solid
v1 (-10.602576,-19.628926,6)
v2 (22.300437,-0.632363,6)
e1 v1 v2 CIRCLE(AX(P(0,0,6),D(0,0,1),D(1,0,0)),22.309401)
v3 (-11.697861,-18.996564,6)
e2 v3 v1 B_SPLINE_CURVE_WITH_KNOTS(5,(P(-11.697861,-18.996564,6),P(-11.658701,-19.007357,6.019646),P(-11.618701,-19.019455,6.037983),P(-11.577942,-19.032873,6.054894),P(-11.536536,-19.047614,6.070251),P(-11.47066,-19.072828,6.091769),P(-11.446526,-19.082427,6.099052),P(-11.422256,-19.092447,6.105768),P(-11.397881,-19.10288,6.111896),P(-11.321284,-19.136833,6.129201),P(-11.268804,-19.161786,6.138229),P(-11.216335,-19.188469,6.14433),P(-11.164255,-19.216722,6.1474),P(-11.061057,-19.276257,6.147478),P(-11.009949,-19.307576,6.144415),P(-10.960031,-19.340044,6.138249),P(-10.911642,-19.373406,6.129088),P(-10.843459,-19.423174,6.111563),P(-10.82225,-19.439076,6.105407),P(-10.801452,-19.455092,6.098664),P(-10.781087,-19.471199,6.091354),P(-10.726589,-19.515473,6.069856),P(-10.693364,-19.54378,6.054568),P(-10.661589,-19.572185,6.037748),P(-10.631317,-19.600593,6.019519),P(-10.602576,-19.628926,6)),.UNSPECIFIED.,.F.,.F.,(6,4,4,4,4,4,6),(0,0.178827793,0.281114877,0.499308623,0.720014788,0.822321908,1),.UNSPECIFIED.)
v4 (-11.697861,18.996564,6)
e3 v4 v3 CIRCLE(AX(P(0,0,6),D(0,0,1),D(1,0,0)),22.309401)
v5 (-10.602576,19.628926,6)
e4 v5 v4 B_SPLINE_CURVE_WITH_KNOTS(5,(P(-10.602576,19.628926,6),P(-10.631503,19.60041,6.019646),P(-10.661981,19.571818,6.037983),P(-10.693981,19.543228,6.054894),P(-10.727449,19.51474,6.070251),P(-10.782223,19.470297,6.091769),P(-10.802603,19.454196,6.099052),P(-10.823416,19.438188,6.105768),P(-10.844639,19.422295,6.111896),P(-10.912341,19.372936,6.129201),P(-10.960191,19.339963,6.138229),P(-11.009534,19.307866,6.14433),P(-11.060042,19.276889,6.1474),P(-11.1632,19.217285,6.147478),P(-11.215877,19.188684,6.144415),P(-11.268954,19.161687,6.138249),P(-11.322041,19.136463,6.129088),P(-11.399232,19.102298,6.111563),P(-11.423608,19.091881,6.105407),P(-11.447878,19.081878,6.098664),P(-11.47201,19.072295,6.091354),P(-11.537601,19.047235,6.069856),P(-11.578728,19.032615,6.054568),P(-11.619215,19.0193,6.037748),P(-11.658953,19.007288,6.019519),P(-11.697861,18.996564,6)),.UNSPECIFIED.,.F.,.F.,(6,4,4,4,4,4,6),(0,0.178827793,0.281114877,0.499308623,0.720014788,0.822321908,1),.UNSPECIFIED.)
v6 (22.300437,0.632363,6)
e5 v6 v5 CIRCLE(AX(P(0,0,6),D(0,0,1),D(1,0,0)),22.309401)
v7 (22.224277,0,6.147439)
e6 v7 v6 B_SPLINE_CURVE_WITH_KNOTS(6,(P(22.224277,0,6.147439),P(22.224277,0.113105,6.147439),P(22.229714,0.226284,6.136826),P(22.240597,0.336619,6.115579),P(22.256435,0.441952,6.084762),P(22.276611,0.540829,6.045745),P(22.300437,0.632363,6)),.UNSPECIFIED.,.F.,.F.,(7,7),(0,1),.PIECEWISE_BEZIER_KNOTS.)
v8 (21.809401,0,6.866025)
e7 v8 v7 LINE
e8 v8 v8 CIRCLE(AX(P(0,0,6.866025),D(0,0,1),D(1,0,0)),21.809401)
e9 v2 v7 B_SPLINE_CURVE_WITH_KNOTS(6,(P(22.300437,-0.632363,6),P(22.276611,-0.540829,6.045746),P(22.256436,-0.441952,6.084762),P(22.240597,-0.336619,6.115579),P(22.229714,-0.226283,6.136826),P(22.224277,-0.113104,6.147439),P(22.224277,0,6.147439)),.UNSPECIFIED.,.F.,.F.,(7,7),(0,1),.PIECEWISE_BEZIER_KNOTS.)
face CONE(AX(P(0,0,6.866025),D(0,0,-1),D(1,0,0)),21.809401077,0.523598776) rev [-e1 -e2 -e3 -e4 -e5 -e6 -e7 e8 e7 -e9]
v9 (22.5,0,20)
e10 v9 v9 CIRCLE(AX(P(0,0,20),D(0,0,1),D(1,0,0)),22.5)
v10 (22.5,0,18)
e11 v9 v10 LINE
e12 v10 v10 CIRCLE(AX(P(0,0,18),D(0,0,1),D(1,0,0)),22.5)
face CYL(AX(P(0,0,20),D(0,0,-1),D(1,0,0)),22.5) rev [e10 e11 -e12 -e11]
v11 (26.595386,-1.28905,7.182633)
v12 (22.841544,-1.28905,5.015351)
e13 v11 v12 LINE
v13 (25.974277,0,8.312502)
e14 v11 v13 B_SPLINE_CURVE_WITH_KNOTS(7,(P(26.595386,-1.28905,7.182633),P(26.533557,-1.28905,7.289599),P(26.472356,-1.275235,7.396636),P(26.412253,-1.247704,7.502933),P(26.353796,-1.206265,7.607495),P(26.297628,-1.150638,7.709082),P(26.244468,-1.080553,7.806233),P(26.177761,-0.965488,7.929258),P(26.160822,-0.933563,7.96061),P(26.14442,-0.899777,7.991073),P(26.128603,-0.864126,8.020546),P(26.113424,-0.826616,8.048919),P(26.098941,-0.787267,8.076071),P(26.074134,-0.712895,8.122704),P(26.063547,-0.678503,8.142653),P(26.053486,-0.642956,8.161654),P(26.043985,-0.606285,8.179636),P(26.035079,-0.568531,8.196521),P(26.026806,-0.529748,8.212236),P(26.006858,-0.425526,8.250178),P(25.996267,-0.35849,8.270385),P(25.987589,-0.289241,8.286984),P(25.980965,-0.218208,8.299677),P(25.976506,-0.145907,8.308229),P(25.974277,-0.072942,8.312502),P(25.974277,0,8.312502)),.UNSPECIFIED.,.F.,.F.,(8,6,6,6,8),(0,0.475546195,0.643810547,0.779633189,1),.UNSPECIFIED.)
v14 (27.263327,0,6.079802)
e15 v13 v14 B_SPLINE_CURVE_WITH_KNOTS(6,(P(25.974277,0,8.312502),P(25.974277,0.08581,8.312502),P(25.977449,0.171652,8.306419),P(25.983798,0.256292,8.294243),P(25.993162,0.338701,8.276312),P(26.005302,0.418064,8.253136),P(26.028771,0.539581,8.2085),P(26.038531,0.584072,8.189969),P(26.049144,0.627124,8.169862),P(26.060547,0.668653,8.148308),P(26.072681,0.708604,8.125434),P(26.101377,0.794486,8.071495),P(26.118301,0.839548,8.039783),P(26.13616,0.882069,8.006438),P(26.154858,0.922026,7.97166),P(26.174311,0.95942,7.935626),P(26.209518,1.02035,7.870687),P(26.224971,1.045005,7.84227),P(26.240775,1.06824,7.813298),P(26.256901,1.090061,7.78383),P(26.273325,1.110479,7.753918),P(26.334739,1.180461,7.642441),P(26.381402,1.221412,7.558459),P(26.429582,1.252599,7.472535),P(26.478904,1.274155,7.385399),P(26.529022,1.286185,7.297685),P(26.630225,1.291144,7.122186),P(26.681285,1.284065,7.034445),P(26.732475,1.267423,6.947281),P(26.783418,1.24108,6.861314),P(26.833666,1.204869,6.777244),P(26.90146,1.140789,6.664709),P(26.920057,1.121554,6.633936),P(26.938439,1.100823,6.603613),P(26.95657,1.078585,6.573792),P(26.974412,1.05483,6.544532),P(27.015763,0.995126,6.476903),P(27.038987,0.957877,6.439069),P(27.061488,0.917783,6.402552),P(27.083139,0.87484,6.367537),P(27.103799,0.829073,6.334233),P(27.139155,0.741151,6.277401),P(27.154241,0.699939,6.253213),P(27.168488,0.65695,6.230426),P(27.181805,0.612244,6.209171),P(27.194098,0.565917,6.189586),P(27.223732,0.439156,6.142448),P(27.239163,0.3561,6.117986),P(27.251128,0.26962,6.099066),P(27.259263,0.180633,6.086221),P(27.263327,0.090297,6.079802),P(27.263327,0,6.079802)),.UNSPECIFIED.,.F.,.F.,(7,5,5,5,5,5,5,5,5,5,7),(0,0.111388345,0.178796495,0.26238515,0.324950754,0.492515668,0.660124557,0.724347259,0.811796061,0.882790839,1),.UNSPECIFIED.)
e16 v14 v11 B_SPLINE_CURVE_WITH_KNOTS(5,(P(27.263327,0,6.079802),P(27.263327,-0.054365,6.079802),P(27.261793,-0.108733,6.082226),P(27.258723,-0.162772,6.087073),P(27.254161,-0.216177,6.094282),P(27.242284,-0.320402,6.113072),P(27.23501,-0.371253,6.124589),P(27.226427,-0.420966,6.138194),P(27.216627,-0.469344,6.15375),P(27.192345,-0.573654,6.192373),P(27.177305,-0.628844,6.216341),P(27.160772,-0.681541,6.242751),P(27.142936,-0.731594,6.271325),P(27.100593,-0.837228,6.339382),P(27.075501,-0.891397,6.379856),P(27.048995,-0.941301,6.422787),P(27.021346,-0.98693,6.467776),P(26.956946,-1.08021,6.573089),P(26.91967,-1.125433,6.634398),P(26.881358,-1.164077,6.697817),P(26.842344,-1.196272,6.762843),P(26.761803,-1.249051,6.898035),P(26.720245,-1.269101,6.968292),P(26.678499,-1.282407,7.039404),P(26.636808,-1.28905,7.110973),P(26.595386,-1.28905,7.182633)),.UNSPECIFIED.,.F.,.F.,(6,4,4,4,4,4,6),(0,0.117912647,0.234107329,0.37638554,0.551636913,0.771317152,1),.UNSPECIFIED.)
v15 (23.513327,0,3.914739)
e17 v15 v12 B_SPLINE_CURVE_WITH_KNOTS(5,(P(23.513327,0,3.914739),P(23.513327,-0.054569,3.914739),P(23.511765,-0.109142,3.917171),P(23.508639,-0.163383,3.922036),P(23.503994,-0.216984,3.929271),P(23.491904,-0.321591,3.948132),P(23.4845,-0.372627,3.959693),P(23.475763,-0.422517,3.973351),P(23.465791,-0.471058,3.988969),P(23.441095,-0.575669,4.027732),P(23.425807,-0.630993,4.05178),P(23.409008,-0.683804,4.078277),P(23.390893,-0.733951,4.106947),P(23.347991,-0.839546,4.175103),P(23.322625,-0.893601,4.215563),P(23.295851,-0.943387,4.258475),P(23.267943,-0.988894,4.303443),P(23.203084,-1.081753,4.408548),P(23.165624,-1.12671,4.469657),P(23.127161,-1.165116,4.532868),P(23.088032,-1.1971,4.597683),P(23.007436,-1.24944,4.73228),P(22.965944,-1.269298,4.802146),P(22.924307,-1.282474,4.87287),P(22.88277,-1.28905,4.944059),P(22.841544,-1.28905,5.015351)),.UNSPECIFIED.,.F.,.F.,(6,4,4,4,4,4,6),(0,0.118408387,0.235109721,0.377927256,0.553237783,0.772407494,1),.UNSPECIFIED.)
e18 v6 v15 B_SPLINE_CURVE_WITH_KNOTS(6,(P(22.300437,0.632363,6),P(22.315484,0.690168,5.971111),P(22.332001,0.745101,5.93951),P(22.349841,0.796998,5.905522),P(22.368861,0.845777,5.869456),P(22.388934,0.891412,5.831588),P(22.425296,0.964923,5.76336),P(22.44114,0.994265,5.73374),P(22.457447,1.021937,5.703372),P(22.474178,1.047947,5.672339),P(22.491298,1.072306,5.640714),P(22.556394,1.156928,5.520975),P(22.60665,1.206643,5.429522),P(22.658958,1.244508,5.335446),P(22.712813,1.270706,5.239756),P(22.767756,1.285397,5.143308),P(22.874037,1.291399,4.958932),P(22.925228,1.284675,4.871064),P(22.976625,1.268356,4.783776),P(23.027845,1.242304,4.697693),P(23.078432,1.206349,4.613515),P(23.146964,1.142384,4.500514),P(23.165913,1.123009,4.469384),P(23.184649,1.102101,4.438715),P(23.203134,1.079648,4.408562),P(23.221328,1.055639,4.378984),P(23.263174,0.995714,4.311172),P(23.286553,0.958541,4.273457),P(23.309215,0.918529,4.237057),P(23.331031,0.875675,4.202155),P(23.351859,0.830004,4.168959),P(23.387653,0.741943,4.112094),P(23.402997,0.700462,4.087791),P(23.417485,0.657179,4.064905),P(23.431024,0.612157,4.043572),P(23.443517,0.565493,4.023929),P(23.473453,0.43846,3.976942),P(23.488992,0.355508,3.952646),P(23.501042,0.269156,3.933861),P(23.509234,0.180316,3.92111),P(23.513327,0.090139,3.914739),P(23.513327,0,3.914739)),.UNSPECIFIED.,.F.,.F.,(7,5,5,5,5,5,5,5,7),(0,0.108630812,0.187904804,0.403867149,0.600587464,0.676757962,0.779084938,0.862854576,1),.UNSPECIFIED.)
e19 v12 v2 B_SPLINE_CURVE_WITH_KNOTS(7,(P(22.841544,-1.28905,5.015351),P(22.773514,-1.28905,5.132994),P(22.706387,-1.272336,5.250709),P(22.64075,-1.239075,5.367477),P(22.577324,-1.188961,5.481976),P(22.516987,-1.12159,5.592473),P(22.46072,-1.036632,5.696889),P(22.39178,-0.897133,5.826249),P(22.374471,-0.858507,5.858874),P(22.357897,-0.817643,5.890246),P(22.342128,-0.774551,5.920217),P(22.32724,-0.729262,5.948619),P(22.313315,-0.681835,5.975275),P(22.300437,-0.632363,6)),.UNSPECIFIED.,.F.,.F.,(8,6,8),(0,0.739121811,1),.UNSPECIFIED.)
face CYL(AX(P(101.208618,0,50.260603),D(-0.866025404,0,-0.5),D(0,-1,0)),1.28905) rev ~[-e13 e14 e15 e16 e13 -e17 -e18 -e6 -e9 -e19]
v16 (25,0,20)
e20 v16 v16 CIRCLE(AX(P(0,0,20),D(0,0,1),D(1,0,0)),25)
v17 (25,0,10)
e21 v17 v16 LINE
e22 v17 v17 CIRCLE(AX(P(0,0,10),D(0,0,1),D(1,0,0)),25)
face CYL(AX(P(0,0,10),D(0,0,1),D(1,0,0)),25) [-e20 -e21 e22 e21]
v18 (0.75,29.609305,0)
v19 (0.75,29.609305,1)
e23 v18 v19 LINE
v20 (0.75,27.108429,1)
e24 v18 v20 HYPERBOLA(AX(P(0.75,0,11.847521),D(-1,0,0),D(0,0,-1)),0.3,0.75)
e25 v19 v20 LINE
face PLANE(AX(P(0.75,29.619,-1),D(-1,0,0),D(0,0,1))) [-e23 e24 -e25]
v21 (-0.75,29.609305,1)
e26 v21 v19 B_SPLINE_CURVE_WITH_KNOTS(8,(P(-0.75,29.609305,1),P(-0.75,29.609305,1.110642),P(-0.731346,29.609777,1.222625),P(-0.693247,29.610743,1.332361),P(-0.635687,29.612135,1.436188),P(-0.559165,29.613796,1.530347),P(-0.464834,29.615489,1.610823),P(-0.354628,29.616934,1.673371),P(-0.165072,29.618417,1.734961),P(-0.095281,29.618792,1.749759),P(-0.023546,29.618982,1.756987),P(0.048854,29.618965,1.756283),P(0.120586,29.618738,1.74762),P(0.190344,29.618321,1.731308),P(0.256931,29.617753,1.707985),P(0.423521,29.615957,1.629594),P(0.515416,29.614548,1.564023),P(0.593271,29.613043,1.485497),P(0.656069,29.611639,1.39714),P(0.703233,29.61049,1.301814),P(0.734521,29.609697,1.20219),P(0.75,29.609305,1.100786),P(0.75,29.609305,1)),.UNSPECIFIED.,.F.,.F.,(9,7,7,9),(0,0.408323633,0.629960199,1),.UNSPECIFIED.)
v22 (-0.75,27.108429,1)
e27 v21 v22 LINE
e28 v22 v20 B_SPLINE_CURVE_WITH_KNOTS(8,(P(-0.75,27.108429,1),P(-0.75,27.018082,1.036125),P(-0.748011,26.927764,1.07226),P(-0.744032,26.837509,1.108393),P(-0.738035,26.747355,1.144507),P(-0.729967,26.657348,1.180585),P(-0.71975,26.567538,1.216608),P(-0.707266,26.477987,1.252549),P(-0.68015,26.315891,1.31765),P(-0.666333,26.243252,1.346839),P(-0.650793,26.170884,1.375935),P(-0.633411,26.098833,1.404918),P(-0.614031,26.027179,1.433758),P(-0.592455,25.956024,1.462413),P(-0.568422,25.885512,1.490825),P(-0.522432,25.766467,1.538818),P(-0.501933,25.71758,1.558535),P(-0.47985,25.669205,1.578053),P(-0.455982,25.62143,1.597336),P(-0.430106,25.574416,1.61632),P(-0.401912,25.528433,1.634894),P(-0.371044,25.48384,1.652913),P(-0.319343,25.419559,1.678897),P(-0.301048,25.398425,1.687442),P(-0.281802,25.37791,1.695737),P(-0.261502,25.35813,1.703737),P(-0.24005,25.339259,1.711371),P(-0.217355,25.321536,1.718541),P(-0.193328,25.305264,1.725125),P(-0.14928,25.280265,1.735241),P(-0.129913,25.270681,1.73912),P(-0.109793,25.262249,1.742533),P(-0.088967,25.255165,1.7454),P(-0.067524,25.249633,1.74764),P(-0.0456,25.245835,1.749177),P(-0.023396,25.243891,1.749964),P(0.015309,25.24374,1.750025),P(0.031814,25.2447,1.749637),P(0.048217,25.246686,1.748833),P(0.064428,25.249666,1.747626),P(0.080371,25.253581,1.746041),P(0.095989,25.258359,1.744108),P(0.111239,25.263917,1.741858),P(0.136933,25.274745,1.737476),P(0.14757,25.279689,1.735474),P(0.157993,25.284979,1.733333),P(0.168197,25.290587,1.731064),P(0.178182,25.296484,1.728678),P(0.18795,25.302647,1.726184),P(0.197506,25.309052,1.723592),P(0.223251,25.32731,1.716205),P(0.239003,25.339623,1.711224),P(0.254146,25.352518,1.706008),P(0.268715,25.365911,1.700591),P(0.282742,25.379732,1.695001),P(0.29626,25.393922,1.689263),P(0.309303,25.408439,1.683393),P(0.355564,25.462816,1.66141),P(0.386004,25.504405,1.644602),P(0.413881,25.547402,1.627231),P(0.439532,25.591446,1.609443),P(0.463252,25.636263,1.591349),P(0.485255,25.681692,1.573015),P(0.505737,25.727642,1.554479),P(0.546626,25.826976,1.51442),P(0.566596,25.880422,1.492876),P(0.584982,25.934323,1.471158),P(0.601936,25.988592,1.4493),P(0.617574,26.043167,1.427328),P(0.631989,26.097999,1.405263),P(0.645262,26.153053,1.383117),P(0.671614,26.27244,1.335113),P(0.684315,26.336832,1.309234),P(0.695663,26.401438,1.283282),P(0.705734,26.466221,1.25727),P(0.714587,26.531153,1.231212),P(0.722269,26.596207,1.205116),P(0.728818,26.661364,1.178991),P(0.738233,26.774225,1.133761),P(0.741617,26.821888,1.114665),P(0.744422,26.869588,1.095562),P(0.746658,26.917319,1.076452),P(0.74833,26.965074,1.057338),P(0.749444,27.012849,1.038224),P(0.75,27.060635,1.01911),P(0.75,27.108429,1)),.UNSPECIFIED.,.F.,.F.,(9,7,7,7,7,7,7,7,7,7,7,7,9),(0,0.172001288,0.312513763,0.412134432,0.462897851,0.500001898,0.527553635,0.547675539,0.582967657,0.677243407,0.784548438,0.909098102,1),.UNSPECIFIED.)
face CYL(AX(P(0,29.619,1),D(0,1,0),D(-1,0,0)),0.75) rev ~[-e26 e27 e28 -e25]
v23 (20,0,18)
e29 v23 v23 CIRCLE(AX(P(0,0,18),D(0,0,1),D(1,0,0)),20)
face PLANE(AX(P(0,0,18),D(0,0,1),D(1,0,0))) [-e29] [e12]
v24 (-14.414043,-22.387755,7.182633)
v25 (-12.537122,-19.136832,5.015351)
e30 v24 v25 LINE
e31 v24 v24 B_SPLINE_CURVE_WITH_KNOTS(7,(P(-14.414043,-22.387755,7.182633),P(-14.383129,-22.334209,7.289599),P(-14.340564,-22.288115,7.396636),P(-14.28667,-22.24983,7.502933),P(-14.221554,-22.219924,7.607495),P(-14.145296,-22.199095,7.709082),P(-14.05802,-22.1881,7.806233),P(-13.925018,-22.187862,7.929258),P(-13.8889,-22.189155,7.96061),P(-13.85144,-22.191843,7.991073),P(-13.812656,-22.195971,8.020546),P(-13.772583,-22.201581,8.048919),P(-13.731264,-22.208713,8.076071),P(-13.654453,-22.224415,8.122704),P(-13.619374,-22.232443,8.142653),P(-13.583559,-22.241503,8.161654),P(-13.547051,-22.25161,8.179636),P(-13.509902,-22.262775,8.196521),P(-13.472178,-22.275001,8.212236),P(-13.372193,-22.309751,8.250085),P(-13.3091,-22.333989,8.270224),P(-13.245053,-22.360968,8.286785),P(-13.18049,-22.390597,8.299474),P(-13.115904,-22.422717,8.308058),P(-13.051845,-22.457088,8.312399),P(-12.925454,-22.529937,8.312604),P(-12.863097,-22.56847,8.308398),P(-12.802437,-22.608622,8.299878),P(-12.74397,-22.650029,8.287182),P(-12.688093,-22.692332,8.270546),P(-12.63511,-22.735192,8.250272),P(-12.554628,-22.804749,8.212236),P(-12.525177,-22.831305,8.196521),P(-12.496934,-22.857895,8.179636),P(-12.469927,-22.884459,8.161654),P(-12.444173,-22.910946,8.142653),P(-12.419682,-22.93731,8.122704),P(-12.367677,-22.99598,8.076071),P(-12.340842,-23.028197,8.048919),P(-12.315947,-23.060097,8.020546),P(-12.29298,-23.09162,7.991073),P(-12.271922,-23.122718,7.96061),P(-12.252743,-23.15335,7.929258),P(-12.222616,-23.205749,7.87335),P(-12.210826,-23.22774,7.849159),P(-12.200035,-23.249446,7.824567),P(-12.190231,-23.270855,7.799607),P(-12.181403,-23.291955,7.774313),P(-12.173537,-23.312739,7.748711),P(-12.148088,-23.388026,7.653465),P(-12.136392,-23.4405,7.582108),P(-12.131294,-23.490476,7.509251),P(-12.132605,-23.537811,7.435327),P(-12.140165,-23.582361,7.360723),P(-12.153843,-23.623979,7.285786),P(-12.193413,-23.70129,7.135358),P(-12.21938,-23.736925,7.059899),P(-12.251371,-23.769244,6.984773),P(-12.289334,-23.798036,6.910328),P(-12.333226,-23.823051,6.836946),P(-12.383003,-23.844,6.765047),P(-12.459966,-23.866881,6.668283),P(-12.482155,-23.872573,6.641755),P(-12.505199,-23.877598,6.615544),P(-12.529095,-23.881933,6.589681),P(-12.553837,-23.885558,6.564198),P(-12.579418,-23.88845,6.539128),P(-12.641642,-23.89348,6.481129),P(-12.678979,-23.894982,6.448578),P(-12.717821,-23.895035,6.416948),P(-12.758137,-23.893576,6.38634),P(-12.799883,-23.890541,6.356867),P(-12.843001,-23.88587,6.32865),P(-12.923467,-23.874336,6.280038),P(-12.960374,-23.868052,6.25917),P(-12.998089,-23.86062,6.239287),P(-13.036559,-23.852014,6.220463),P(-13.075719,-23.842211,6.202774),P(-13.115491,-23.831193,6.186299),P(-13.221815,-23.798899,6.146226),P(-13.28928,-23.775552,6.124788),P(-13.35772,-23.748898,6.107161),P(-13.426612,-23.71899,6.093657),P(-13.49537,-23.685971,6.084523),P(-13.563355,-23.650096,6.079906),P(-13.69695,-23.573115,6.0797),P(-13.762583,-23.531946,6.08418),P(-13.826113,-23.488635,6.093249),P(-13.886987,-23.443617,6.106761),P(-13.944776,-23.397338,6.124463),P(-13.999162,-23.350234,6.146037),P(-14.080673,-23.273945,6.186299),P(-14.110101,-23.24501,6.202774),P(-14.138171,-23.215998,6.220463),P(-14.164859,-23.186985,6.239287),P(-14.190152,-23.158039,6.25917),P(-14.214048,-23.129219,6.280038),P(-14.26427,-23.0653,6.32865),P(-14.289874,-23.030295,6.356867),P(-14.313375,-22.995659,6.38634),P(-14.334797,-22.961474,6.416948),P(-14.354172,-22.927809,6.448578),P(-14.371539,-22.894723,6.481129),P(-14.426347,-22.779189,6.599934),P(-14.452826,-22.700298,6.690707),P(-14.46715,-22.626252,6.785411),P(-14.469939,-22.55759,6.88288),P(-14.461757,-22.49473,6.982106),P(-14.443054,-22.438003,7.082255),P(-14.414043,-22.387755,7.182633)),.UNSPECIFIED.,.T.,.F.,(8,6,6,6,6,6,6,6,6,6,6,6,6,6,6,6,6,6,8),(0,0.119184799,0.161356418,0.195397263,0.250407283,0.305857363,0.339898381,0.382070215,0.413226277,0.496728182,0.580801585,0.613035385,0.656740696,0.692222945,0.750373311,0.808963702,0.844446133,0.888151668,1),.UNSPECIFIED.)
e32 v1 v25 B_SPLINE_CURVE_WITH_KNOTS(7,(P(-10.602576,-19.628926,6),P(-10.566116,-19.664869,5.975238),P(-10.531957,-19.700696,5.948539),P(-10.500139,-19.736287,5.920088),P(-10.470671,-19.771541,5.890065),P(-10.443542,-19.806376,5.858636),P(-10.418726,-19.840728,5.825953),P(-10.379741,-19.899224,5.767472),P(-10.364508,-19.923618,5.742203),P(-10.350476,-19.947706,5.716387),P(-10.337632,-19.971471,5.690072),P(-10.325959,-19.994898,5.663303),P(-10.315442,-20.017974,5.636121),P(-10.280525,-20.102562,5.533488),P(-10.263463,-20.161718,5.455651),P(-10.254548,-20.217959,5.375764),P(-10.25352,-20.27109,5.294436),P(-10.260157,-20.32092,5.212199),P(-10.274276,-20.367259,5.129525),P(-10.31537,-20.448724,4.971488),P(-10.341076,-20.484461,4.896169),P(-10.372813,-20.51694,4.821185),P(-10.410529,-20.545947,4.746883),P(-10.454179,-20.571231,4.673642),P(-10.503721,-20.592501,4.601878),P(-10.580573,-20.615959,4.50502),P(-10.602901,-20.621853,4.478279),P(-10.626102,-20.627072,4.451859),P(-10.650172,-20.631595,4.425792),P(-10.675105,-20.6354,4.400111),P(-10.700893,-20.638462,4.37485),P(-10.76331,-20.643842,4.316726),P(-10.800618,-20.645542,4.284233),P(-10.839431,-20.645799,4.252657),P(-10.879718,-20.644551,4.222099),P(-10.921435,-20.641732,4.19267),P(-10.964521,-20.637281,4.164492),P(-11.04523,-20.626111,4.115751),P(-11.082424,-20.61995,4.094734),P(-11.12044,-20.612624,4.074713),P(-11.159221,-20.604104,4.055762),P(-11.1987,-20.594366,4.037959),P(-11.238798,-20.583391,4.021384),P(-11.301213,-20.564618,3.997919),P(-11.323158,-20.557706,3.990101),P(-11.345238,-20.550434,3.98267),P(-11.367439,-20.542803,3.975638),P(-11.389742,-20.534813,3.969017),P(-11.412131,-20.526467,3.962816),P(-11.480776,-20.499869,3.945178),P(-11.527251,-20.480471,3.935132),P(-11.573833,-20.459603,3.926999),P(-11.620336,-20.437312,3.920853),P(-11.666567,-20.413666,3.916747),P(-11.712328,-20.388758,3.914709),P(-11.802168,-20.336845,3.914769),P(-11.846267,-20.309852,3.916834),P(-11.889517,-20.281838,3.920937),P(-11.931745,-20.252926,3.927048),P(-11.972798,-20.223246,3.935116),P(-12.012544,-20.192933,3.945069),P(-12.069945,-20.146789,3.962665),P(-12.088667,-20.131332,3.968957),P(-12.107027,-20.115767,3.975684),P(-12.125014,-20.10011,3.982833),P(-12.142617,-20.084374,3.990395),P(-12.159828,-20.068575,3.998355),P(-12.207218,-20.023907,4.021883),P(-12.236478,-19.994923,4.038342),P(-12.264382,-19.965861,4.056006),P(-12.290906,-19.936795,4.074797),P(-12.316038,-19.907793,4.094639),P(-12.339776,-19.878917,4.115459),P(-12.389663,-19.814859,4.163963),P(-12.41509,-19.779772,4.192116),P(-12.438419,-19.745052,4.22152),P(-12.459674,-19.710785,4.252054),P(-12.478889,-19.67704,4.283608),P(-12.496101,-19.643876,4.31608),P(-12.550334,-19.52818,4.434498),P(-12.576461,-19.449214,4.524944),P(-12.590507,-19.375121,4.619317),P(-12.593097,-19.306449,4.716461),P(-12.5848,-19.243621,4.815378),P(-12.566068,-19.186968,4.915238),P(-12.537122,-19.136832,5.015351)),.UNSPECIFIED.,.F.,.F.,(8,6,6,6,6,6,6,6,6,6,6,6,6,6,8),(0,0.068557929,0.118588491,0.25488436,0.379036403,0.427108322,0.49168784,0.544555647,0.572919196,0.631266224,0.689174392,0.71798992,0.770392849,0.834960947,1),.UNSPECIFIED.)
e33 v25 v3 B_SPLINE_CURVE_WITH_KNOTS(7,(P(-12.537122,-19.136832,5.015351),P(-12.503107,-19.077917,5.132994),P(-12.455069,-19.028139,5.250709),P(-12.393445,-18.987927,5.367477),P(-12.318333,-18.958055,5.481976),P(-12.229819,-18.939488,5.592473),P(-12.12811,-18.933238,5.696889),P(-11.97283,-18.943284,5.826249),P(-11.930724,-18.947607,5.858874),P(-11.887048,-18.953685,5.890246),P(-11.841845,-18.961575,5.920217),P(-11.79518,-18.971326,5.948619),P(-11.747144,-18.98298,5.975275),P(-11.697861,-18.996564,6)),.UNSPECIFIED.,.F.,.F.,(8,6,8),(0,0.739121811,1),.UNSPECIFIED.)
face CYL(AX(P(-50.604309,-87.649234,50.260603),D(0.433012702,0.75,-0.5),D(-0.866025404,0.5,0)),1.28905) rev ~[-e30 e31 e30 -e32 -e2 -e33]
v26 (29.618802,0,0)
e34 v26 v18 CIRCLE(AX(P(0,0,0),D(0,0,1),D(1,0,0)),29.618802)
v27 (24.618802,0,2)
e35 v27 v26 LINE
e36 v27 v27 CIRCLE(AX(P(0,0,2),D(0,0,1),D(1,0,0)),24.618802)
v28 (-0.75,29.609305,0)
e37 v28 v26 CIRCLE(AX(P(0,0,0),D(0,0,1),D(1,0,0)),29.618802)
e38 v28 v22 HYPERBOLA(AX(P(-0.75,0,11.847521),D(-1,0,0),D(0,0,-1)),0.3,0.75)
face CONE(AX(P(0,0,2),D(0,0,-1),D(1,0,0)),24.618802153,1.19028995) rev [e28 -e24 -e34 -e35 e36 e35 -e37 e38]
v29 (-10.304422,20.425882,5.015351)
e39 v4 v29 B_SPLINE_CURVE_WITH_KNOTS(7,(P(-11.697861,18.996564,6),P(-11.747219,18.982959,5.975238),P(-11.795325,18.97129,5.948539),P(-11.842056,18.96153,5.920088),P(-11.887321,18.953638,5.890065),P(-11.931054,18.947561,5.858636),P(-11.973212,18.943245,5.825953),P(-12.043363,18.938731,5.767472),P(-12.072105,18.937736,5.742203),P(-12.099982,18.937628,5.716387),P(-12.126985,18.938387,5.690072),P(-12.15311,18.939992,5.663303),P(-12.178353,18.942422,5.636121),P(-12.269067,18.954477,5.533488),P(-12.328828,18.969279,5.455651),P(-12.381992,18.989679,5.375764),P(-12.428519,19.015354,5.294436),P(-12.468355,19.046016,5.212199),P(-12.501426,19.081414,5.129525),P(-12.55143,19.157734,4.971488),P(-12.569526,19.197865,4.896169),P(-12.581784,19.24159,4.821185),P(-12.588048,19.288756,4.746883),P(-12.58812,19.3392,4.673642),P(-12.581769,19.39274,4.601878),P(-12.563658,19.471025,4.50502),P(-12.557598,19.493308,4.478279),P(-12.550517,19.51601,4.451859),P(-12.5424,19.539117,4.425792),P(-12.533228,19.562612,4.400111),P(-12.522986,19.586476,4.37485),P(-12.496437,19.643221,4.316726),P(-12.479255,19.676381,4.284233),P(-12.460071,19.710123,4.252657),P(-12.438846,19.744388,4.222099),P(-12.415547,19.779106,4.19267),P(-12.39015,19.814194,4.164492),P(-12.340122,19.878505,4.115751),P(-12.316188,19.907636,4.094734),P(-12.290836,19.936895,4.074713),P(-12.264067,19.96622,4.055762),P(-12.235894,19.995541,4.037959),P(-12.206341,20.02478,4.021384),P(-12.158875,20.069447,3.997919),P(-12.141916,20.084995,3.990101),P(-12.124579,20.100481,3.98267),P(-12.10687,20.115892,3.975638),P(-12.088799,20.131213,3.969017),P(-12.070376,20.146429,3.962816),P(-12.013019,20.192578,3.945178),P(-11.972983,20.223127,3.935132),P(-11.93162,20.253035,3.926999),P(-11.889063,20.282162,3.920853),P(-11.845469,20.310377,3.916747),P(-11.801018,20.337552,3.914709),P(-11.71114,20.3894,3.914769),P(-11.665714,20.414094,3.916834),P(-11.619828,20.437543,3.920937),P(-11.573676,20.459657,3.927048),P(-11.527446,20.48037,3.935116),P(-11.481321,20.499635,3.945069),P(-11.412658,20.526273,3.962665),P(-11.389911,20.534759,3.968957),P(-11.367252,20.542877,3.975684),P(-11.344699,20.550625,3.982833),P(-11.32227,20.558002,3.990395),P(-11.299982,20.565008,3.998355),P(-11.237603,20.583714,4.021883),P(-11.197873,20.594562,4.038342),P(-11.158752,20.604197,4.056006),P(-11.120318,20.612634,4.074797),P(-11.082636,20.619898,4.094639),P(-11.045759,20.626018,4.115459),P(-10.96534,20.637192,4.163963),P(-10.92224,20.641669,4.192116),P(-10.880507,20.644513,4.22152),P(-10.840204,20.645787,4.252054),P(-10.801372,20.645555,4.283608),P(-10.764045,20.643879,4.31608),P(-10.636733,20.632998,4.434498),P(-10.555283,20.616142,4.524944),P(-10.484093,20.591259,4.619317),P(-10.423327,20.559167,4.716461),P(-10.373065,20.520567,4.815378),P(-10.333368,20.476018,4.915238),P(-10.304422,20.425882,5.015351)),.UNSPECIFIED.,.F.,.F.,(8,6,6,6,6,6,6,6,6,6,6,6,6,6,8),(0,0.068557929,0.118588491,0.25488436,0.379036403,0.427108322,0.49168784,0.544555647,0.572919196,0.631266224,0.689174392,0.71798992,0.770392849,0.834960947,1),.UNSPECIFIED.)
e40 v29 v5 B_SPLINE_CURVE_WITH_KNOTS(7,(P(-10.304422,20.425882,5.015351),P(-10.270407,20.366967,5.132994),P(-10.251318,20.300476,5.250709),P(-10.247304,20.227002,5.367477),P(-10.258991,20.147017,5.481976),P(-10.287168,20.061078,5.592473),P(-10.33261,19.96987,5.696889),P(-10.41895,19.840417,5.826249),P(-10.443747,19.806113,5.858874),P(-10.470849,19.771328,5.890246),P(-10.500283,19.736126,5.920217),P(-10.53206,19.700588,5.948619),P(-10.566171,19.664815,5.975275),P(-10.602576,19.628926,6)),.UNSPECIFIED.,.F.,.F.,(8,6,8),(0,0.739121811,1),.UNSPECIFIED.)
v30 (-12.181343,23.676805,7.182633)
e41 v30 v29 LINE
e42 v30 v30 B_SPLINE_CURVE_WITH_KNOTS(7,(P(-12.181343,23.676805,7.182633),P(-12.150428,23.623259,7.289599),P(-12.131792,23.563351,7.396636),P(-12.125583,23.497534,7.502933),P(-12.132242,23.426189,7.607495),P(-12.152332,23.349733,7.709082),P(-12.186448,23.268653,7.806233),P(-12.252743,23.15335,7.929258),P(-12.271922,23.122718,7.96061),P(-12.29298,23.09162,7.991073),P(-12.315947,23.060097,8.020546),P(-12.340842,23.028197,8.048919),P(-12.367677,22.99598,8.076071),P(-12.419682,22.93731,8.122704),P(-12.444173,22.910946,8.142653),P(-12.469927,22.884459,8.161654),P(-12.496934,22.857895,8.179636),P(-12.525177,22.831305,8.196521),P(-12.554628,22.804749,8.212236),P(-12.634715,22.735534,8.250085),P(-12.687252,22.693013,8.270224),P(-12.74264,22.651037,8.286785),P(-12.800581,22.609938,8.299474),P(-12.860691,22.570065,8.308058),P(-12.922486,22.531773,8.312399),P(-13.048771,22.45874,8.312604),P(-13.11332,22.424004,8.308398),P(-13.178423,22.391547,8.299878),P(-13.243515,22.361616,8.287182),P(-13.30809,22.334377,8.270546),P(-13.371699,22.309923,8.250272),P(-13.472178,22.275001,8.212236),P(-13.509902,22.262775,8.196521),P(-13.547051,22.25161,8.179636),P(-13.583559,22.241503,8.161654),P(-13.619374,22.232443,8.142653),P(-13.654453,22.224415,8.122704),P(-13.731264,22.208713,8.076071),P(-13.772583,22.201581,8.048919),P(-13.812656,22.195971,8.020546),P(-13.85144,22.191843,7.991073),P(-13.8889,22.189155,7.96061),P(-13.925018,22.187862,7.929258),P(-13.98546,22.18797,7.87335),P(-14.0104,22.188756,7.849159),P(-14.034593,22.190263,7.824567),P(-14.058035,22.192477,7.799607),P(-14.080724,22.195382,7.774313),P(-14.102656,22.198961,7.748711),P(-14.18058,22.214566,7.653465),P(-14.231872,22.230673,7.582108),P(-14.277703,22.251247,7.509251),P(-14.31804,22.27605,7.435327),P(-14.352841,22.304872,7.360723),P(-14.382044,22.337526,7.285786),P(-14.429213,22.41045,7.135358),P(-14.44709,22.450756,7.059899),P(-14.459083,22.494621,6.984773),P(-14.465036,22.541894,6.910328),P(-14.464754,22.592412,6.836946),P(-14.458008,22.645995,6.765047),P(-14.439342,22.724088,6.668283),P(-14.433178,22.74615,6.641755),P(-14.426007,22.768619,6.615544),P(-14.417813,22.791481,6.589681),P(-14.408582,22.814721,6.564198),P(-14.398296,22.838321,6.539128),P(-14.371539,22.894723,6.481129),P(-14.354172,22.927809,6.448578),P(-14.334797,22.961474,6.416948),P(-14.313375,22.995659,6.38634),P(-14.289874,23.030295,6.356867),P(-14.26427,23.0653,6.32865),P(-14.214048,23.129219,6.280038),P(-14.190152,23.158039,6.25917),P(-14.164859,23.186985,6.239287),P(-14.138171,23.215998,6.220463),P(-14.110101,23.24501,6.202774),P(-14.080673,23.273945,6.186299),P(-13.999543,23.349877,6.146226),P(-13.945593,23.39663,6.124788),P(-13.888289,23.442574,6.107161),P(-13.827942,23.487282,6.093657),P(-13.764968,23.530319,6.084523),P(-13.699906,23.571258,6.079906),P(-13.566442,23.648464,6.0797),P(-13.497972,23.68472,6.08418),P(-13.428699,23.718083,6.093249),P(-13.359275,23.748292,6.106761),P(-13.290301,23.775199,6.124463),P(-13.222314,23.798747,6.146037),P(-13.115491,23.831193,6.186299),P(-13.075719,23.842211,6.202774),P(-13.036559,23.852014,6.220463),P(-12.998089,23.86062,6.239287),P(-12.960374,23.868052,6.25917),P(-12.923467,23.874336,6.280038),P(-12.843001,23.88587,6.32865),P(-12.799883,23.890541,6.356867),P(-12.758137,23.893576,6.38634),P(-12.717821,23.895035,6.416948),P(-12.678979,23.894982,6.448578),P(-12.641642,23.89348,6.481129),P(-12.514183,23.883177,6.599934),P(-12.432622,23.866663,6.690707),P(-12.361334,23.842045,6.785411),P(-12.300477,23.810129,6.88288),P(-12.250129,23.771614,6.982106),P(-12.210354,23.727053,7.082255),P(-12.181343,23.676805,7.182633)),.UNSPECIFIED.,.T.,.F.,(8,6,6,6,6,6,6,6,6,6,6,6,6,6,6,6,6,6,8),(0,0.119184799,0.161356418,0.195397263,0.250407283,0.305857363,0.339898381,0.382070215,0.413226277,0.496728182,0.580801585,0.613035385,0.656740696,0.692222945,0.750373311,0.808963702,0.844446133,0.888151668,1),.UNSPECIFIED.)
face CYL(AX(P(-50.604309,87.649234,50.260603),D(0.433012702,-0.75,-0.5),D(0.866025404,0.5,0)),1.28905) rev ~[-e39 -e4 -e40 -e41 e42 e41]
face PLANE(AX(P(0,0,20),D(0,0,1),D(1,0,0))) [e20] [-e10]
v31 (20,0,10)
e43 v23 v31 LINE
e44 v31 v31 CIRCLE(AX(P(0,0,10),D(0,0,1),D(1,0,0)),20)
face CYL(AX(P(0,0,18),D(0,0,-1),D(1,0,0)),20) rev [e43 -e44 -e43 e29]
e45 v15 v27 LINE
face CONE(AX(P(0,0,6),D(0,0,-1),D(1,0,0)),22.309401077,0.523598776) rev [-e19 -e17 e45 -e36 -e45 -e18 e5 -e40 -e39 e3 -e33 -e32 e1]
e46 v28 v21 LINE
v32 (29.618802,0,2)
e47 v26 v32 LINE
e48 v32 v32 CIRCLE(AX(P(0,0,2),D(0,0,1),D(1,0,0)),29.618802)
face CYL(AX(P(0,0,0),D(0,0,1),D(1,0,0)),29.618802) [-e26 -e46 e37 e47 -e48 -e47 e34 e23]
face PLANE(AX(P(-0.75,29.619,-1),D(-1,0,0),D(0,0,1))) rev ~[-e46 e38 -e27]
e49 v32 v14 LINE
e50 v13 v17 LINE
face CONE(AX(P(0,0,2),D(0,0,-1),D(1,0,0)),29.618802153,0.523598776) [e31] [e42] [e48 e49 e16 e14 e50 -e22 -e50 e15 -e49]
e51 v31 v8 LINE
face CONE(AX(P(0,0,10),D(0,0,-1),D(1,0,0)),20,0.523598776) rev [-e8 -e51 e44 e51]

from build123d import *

# Parameters (mm, degrees)
F4_D            = 2.5781
F4_COPIES_COUNT = 3
F7_W            = 1.5
F7_H            = 2
F8_DEPTH        = 25


# Not quite as in the source:
# - a pattern or mirror of a feature is missing from the dataset's text; its kind, count and spacing are read off the source's solid


with BuildPart() as f1:
    # F0 (on Front) → F1 (revolve)
    with BuildSketch(Plane.XZ):
        Polygon((22.5, 18), (20, 18), (20, 10), (21.8094010768, 6.8660254038), (22.3094010768, 6), (24.6188021535, 2), (29.6188021535, 0), (29.6188021535, 2), (25, 10), (25, 18), (25, 20), (22.5, 20), align=None)
    revolve(axis=Axis((0, 0, 41.8434557322), (0, 0, 1)))

    # F4 (through all)
    with Locations(Plane(origin=(23.0801270189, 0, 13.3253175473), x_dir=(0, 1, 0), z_dir=(0.8660254038, 0, 0.5))):
        with Locations((0, -7.0773502692)):
            f4 = Hole(F4_D / 2)

    # F4_copies: F4 ×3 about axis
    f4_copies_axis = Axis((0, 0, 0), (0, 0, 1))
    for i in range(1, F4_COPIES_COUNT):
        add(f4.rotate(f4_copies_axis, i * 360 / F4_COPIES_COUNT), mode=Mode.SUBTRACT)

    # F7 (on line) → F8 (cut)
    with BuildSketch(Plane(origin=(0, 29.619, 0), x_dir=(-1, 0, 0), z_dir=(0, 1, 0))):
        Rectangle(F7_W, F7_H)
        with BuildLine():
            Line((-0.75, 1), (0.75, 1))
            ThreePointArc((0.75, 1), (0, 1.75), (-0.75, 1))
        make_face()
    extrude(amount=-F8_DEPTH, mode=Mode.SUBTRACT)


solid = f1.part
